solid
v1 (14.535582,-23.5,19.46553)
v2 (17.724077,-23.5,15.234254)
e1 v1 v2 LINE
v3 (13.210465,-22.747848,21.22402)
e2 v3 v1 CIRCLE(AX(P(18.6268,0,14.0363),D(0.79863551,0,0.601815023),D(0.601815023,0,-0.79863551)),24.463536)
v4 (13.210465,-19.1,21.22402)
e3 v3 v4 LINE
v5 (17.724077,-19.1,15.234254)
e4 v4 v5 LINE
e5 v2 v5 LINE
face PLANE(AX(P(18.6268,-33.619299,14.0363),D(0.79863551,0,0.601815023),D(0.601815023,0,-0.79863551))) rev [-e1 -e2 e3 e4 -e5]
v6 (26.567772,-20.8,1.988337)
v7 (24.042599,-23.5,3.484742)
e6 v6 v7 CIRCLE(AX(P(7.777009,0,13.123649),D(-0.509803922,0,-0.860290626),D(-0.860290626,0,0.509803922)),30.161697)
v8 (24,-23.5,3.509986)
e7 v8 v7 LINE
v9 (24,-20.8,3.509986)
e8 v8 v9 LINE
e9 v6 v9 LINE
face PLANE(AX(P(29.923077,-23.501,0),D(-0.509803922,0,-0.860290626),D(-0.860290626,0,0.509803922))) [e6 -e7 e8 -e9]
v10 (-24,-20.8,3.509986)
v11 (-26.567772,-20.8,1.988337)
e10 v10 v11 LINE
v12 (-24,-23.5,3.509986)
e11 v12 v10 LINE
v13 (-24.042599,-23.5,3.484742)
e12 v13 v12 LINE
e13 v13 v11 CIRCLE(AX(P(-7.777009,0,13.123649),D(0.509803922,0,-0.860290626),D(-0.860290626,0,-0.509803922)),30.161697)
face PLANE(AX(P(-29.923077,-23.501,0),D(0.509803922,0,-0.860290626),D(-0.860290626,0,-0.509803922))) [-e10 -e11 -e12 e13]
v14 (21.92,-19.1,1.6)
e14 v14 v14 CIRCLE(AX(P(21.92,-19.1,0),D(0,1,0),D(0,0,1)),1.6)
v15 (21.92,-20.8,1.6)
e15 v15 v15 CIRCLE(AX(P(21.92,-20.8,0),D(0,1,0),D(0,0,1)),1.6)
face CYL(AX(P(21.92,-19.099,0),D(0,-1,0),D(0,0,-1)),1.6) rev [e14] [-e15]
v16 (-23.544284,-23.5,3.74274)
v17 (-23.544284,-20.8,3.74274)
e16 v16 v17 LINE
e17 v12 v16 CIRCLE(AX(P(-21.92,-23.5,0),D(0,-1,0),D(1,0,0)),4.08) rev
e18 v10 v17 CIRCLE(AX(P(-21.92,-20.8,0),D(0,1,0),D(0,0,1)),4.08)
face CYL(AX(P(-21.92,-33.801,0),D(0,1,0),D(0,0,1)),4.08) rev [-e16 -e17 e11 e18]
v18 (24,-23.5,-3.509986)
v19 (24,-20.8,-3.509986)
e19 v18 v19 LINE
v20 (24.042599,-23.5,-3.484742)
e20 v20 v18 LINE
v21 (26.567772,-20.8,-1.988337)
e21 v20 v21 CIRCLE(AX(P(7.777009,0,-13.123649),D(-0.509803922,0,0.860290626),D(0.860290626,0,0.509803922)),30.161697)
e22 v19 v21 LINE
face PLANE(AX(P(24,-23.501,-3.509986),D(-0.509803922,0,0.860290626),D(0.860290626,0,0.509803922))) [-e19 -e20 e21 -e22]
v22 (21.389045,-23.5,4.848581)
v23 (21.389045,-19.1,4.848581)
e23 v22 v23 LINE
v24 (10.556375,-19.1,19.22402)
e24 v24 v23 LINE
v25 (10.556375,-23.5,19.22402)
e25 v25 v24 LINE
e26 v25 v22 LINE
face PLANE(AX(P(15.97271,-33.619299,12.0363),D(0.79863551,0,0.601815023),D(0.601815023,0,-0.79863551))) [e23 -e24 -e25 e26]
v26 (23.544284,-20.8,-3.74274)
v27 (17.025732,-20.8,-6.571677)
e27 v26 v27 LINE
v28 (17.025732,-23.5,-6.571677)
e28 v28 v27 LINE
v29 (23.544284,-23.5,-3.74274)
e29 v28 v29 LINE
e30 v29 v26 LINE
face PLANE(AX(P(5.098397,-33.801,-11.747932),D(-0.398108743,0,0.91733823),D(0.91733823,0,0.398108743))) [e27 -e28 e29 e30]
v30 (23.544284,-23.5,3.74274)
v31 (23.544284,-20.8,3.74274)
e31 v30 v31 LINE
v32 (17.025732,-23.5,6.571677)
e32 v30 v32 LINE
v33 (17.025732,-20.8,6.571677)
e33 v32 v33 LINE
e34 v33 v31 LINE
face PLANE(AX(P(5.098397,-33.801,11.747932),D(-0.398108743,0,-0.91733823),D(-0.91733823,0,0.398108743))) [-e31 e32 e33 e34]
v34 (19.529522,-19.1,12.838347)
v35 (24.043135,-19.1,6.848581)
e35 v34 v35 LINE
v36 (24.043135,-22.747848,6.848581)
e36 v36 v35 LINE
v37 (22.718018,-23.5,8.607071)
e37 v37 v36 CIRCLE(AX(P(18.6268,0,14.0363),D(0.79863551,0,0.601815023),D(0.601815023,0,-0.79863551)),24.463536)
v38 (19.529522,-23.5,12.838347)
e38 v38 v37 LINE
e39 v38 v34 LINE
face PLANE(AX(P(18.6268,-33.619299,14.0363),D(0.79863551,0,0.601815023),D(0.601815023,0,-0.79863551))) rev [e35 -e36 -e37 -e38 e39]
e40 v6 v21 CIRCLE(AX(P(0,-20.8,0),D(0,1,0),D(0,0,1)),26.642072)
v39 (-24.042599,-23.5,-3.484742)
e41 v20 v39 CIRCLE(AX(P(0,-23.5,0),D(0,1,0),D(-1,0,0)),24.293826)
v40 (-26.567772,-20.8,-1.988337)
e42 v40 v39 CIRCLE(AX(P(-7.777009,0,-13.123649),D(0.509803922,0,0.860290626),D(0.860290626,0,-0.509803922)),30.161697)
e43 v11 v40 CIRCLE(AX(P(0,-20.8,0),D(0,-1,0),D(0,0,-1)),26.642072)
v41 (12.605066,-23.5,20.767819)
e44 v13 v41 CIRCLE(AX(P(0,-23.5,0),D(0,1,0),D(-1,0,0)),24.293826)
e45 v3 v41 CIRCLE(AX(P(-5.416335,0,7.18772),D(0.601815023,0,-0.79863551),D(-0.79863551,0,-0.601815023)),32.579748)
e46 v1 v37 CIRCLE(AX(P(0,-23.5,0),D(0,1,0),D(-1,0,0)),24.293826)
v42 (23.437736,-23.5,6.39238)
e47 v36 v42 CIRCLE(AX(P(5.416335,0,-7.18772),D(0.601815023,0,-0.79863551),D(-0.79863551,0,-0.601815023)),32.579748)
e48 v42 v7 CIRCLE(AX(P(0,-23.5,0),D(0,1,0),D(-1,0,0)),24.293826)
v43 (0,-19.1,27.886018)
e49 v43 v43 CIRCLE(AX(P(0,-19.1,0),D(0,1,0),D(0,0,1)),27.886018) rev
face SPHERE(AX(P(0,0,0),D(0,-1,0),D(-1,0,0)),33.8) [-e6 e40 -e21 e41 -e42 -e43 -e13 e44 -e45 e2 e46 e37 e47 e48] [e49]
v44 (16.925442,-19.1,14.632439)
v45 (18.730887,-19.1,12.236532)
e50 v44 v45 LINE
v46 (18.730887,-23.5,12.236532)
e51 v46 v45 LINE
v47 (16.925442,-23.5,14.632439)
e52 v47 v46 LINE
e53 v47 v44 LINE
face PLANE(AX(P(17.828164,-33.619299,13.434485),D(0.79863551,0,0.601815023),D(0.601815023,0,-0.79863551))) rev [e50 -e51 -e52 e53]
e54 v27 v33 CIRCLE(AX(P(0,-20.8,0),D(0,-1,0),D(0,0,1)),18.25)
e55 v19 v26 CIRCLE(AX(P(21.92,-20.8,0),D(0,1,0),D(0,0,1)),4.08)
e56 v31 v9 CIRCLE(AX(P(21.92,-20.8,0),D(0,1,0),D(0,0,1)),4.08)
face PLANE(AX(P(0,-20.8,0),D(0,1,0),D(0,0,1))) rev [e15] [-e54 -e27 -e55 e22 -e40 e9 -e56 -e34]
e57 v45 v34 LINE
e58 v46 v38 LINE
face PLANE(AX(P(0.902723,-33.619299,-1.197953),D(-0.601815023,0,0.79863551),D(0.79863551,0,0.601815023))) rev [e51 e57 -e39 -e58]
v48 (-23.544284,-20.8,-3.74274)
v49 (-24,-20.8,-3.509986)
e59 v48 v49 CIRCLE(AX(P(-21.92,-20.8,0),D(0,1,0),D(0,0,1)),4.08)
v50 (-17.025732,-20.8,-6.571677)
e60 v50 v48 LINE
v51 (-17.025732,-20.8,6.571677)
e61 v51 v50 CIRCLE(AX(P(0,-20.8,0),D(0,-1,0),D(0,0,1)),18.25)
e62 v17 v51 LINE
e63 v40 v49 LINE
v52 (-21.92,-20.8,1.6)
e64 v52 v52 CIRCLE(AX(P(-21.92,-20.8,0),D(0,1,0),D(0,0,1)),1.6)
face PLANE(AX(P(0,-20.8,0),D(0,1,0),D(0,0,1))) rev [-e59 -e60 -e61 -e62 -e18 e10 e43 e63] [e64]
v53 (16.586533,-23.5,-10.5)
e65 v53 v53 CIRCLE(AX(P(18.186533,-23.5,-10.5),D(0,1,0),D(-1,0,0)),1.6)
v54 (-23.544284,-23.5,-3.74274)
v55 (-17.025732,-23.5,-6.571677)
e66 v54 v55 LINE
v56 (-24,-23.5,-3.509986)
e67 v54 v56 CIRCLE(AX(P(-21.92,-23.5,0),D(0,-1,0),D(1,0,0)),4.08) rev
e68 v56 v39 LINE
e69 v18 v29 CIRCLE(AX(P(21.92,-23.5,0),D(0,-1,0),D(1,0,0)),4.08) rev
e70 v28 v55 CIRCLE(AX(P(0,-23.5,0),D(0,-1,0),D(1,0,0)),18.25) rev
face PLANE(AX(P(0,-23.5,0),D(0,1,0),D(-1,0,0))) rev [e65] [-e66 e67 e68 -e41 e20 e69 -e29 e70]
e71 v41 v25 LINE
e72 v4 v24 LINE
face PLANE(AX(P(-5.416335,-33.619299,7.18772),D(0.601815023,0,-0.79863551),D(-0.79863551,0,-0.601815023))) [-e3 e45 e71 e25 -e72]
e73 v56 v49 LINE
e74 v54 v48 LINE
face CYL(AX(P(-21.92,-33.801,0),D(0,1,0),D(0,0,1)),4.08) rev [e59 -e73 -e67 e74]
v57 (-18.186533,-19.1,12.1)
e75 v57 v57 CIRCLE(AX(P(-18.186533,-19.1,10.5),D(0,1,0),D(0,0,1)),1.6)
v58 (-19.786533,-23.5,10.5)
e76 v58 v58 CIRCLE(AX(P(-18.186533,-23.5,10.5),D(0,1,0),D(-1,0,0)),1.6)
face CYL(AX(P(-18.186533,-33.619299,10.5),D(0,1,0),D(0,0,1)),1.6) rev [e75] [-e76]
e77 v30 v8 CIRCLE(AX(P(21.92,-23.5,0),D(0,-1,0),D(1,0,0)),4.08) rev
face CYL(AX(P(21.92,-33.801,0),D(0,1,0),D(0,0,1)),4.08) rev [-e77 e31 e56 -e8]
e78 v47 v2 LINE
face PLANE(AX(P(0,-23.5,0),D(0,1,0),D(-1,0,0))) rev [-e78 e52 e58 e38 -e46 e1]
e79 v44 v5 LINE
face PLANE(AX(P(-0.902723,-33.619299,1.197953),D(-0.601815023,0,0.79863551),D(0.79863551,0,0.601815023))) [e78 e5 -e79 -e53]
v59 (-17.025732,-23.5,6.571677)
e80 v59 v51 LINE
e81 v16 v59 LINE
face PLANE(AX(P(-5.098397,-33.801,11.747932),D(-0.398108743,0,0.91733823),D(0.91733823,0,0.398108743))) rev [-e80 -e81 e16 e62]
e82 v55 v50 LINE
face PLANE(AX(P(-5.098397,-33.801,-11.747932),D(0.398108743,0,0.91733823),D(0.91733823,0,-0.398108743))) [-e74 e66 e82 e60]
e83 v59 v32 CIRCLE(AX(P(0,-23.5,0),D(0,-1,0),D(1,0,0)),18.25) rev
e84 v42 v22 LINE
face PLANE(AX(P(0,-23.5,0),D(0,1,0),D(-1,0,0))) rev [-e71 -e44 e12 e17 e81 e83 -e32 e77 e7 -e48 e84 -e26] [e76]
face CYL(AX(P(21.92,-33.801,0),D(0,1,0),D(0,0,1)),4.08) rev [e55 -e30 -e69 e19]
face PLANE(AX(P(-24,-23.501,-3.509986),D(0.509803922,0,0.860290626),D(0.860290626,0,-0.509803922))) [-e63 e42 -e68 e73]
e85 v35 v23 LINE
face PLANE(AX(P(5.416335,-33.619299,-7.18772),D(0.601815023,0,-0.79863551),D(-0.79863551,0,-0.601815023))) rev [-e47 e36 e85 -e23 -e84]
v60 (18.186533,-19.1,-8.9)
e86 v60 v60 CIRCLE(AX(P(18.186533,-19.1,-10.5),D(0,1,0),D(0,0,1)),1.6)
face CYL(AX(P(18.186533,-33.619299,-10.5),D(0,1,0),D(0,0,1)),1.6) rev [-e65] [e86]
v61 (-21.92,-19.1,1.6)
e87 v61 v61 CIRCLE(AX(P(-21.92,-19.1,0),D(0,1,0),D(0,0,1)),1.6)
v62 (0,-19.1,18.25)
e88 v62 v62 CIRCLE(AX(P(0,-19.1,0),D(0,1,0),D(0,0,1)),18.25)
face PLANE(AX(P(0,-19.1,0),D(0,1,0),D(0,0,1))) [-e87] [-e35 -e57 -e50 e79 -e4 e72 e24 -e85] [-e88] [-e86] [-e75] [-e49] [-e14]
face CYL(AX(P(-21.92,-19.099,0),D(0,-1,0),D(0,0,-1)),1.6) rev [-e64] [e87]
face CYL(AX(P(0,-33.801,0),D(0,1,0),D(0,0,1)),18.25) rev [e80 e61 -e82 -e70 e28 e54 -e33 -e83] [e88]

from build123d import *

# Parameters (mm, degrees)
SKETCH2_R                = 33.8
CUT_EXTRUDE1_DEPTH       = 19.1
CUT_EXTRUDE2_START       = -33.8
CUT_EXTRUDE2_DEPTH       = 14.7
BOSS_EXTRUDE2_START      = -1.7
BOSS_EXTRUDE2_DEPTH      = 1.7
CUT_EXTRUDE3_REACH       = 42.172
SKETCH6_R                = 1.6
SKETCH19_R               = 9
CUT_EXTRUDE10_DEPTH      = 1.4
CUT_EXTRUDE11_REACH      = 42.429
CUT_EXTRUDE11_END_RADIUS = 33.8
SKETCH20_R               = 3.5
CUT_EXTRUDE9_REACH       = 44.024
CUT_EXTRUDE9_END_RADIUS  = 33.8
CUT_EXTRUDE7_REACH       = 44.024
CUT_EXTRUDE7_END_RADIUS  = 33.8
SKETCH10_R               = 1.6
CUT_EXTRUDE12_START      = -10.118299
SKETCH21_R               = 27.886018002
CUT_EXTRUDE12_DEPTH      = 10.118299
CUT_EXTRUDE13_REACH      = 41.529


# Read off the part's stored shape, not the designer's step: Revolve2
with BuildPart() as part:
    # Sketch1 → Revolve1 (revolve)
    with BuildSketch(Plane.XY, mode=Mode.PRIVATE) as revolve1_sk:
        with BuildLine():
            Line((0, -33.8), (0, 0))
            Line((0, 0), (33.8, 0))
            ThreePointArc((33.8, 0), (23.900209204, -23.900209204), (0, -33.8))
        make_face()
    revolve(revolve1_sk.sketch.rotate(Axis((0, -33.8, 0), (0, 1, 0)), 180), axis=Axis((0, -33.8, 0), (0, 1, 0)))

    # Sketch2 → Cut-Extrude1 (cut)
    with BuildSketch(Plane(origin=(0, 0, 0), x_dir=(1, 0, 0), z_dir=(0, 1, 0))):
        Circle(SKETCH2_R)
    extrude(amount=-CUT_EXTRUDE1_DEPTH, mode=Mode.SUBTRACT)

    # Sketch5 → Cut-Extrude2 (cut)
    with BuildSketch(Plane(origin=(0, 0, 0), x_dir=(1, 0, 0), z_dir=(0, 1, 0)).offset(CUT_EXTRUDE2_START)):
        with BuildLine():
            Line((-17.025732229, 6.571677263), (-23.544283672, 3.742739979))
            ThreePointArc((-23.544283672, 3.742739979), (-23.775794442, 3.633514413), (-24, 3.509985755))
            Line((-24, 3.509985755), (-24, -3.509985755))
            ThreePointArc((-24, -3.509985755), (-23.775794442, -3.633514413), (-23.544283672, -3.742739979))
            Line((-23.544283672, -3.742739979), (-17.025732229, -6.571677263))
            ThreePointArc((-17.025732229, -6.571677263), (0, -18.25), (17.025732229, -6.571677263))
            Line((17.025732229, -6.571677263), (23.544283672, -3.742739979))
            ThreePointArc((23.544283672, -3.742739979), (23.775794442, -3.633514413), (24, -3.509985755))
            Line((24, -3.509985755), (24, 3.509985755))
            ThreePointArc((24, 3.509985755), (23.775794442, 3.633514413), (23.544283672, 3.742739979))
            Line((23.544283672, 3.742739979), (17.025732229, 6.571677263))
            ThreePointArc((17.025732229, 6.571677263), (0, 18.25), (-17.025732229, 6.571677263))
        make_face()
    extrude(amount=CUT_EXTRUDE2_DEPTH, mode=Mode.SUBTRACT)

    # Sketch16 → Boss-Extrude2 (add)
    with BuildSketch(Plane(origin=(0, -19.1, 0), x_dir=(1, 0, 0), z_dir=(0, 1, 0)).offset(BOSS_EXTRUDE2_START)):
        with BuildLine():
            Line((17.025732229, 6.571677263), (23.544283672, 3.742739979))
            ThreePointArc((23.544283672, 3.742739979), (23.775794442, 3.633514413), (24, 3.509985755))
            Line((24, 3.509985755), (24, -3.509985755))
            ThreePointArc((24, -3.509985755), (23.775794442, -3.633514413), (23.544283672, -3.742739979))
            Line((23.544283672, -3.742739979), (17.025732229, -6.571677263))
            ThreePointArc((17.025732229, -6.571677263), (18.25, 0), (17.025732229, 6.571677263))
        make_face()
        with BuildLine():
            Line((-23.544283672, -3.742739979), (-17.025732229, -6.571677263))
            ThreePointArc((-17.025732229, -6.571677263), (-18.25, 0), (-17.025732229, 6.571677263))
            Line((-17.025732229, 6.571677263), (-23.544283672, 3.742739979))
            ThreePointArc((-23.544283672, 3.742739979), (-23.775794442, 3.633514413), (-24, 3.509985755))
            Line((-24, 3.509985755), (-24, -3.509985755))
            ThreePointArc((-24, -3.509985755), (-23.775794442, -3.633514413), (-23.544283672, -3.742739979))
        make_face()
    extrude(amount=BOSS_EXTRUDE2_DEPTH)

    # Sketch6 → Cut-Extrude3 (cut, up to next)
    with BuildSketch(Plane(origin=(0, -20.8, 0), x_dir=(1, 0, 0), z_dir=(0, 1, 0)), mode=Mode.PRIVATE) as cut_extrude3_sk1:
        with Locations(Location((-21.92, 0, 0), (0, 0, 270))):
            Circle(SKETCH6_R)
    cut_extrude3_tool1 = extrude(cut_extrude3_sk1.sketch, amount=CUT_EXTRUDE3_REACH, mode=Mode.PRIVATE) & part.part
    # Sketch6 → Cut-Extrude3 (cut, up to next)
    with BuildSketch(Plane(origin=(0, -20.8, 0), x_dir=(1, 0, 0), z_dir=(0, 1, 0)), mode=Mode.PRIVATE) as cut_extrude3_sk2:
        with Locations(Location((21.92, 0, 0), (0, 0, 270))):
            Circle(SKETCH6_R)
    cut_extrude3_tool2 = extrude(cut_extrude3_sk2.sketch, amount=CUT_EXTRUDE3_REACH, mode=Mode.PRIVATE) & part.part
    add(cut_extrude3_tool1.solids().sort_by_distance((-21.92, -20.8, 0))[0], mode=Mode.SUBTRACT)
    add(cut_extrude3_tool2.solids().sort_by_distance((21.92, -20.8, 0))[0], mode=Mode.SUBTRACT)

    # Revolve2 outline → Revolve2 (revolve)
    with BuildSketch(Plane.XY):
        with BuildLine():
            Line((0, -23.5), (0, -33.8))
            ThreePointArc((0, -33.8), (13.168073663, -31.129436808), (24.255308697, -23.53975361))
            Line((24.255308697, -23.53975361), (24.255308697, -23.5))
            Line((24.255308697, -23.5), (0, -23.5))
        make_face()
    revolve(axis=Axis((0, 0, 0), (0, 1, 0)))

    # Sketch19 → Cut-Extrude10 (cut)
    with BuildSketch(Plane(origin=(0, -23.5, 0), x_dir=(1, 0, 0), z_dir=(0, 1, 0))):
        with Locations(Location((0, 0, 0), (0, 0, 180))):
            Circle(SKETCH19_R)
    extrude(amount=-CUT_EXTRUDE10_DEPTH, mode=Mode.SUBTRACT)

    # Cut-Extrude11: up to this sphere (the profile starts inside it)
    cut_extrude11_end = Location((0, 0, 0)) * Sphere(CUT_EXTRUDE11_END_RADIUS, mode=Mode.PRIVATE)
    # Sketch20 → Cut-Extrude11 (cut, up to the surface)
    with BuildSketch(Plane(origin=(0, -24.9, 0), x_dir=(1, 0, 0), z_dir=(0, 1, 0)), mode=Mode.PRIVATE) as cut_extrude11_sk1:
        with Locations(Location((0, 0, 0), (0, 0, 180))):
            Circle(SKETCH20_R)
    cut_extrude11_tool1 = extrude(cut_extrude11_sk1.sketch, amount=-CUT_EXTRUDE11_REACH, mode=Mode.PRIVATE) & cut_extrude11_end
    add(cut_extrude11_tool1.solids().sort_by_distance((0, -24.9, 0))[0], mode=Mode.SUBTRACT)

    # Cut-Extrude9: up to this sphere (the profile starts inside it)
    cut_extrude9_end = Location((0, 0, 0)) * Sphere(CUT_EXTRUDE9_END_RADIUS, mode=Mode.PRIVATE)
    # Sketch13 → Cut-Extrude9 (cut, up to the surface)
    with BuildSketch(Plane(origin=(0, -19.1, 0), x_dir=(1, 0, 0), z_dir=(0, 1, 0)), mode=Mode.PRIVATE) as cut_extrude9_sk1:
        Polygon((10.556374993, -19.224020053), (13.210464636, -21.224020053), (17.724077309, -15.234253728), (16.925441799, -14.632438705), (18.730886869, -12.236532175), (19.529522379, -12.838347198), (24.043135053, -6.848580873), (21.389045409, -4.848580873), align=None)
    cut_extrude9_tool1 = extrude(cut_extrude9_sk1.sketch, amount=-CUT_EXTRUDE9_REACH, mode=Mode.PRIVATE) & cut_extrude9_end
    add(cut_extrude9_tool1.solids().sort_by_distance((17.250772, -19.1, 12.999389))[0], mode=Mode.SUBTRACT)

    # Cut-Extrude7: up to this sphere (the profile starts inside it)
    cut_extrude7_end = Location((0, 0, 0)) * Sphere(CUT_EXTRUDE7_END_RADIUS, mode=Mode.PRIVATE)
    # Sketch10 → Cut-Extrude7 (cut, up to the surface)
    with BuildSketch(Plane(origin=(0, -19.1, 0), x_dir=(1, 0, 0), z_dir=(0, 1, 0)), mode=Mode.PRIVATE) as cut_extrude7_sk1:
        with Locations(Location((-18.186533479, -10.5, 0), (0, 0, 270))):
            Circle(SKETCH10_R)
    cut_extrude7_tool1 = extrude(cut_extrude7_sk1.sketch, amount=-CUT_EXTRUDE7_REACH, mode=Mode.PRIVATE) & cut_extrude7_end
    add(cut_extrude7_tool1.solids().sort_by_distance((-18.186533, -19.1, 10.5))[0], mode=Mode.SUBTRACT)
    # Sketch10 → Cut-Extrude7 (cut, up to the surface)
    with BuildSketch(Plane(origin=(0, -19.1, 0), x_dir=(1, 0, 0), z_dir=(0, 1, 0)), mode=Mode.PRIVATE) as cut_extrude7_sk2:
        with Locations(Location((18.186533479, 10.5, 0), (0, 0, 270))):
            Circle(SKETCH10_R)
    cut_extrude7_tool2 = extrude(cut_extrude7_sk2.sketch, amount=-CUT_EXTRUDE7_REACH, mode=Mode.PRIVATE) & cut_extrude7_end
    add(cut_extrude7_tool2.solids().sort_by_distance((18.186533, -19.1, -10.5))[0], mode=Mode.SUBTRACT)

    # Sketch21 → Cut-Extrude12 (cut)
    with BuildSketch(Plane(origin=(0, -23.5, 0), x_dir=(1, 0, 0), z_dir=(0, 1, 0)).offset(CUT_EXTRUDE12_START)):
        Circle(SKETCH21_R)
    extrude(amount=CUT_EXTRUDE12_DEPTH, mode=Mode.SUBTRACT)

    # Sketch23 → Cut-Extrude13 (cut, up to next)
    with BuildSketch(Plane.XZ.offset(20.8), mode=Mode.PRIVATE) as cut_extrude13_sk1:
        Polygon((24, 3.509985755), (24, -3.509985755), (29.923076923, 0), align=None)
    cut_extrude13_tool1 = extrude(cut_extrude13_sk1.sketch, amount=CUT_EXTRUDE13_REACH, mode=Mode.PRIVATE) & part.part
    # Sketch23 → Cut-Extrude13 (cut, up to next)
    with BuildSketch(Plane.XZ.offset(20.8), mode=Mode.PRIVATE) as cut_extrude13_sk2:
        Polygon((-24, 3.509985755), (-24, -3.509985755), (-29.923076923, 0), align=None)
    cut_extrude13_tool2 = extrude(cut_extrude13_sk2.sketch, amount=CUT_EXTRUDE13_REACH, mode=Mode.PRIVATE) & part.part
    add(cut_extrude13_tool1.solids().sort_by_distance((25.974359, -20.8, 0))[0], mode=Mode.SUBTRACT)
    add(cut_extrude13_tool2.solids().sort_by_distance((-25.974359, -20.8, 0))[0], mode=Mode.SUBTRACT)


solid = part.part
